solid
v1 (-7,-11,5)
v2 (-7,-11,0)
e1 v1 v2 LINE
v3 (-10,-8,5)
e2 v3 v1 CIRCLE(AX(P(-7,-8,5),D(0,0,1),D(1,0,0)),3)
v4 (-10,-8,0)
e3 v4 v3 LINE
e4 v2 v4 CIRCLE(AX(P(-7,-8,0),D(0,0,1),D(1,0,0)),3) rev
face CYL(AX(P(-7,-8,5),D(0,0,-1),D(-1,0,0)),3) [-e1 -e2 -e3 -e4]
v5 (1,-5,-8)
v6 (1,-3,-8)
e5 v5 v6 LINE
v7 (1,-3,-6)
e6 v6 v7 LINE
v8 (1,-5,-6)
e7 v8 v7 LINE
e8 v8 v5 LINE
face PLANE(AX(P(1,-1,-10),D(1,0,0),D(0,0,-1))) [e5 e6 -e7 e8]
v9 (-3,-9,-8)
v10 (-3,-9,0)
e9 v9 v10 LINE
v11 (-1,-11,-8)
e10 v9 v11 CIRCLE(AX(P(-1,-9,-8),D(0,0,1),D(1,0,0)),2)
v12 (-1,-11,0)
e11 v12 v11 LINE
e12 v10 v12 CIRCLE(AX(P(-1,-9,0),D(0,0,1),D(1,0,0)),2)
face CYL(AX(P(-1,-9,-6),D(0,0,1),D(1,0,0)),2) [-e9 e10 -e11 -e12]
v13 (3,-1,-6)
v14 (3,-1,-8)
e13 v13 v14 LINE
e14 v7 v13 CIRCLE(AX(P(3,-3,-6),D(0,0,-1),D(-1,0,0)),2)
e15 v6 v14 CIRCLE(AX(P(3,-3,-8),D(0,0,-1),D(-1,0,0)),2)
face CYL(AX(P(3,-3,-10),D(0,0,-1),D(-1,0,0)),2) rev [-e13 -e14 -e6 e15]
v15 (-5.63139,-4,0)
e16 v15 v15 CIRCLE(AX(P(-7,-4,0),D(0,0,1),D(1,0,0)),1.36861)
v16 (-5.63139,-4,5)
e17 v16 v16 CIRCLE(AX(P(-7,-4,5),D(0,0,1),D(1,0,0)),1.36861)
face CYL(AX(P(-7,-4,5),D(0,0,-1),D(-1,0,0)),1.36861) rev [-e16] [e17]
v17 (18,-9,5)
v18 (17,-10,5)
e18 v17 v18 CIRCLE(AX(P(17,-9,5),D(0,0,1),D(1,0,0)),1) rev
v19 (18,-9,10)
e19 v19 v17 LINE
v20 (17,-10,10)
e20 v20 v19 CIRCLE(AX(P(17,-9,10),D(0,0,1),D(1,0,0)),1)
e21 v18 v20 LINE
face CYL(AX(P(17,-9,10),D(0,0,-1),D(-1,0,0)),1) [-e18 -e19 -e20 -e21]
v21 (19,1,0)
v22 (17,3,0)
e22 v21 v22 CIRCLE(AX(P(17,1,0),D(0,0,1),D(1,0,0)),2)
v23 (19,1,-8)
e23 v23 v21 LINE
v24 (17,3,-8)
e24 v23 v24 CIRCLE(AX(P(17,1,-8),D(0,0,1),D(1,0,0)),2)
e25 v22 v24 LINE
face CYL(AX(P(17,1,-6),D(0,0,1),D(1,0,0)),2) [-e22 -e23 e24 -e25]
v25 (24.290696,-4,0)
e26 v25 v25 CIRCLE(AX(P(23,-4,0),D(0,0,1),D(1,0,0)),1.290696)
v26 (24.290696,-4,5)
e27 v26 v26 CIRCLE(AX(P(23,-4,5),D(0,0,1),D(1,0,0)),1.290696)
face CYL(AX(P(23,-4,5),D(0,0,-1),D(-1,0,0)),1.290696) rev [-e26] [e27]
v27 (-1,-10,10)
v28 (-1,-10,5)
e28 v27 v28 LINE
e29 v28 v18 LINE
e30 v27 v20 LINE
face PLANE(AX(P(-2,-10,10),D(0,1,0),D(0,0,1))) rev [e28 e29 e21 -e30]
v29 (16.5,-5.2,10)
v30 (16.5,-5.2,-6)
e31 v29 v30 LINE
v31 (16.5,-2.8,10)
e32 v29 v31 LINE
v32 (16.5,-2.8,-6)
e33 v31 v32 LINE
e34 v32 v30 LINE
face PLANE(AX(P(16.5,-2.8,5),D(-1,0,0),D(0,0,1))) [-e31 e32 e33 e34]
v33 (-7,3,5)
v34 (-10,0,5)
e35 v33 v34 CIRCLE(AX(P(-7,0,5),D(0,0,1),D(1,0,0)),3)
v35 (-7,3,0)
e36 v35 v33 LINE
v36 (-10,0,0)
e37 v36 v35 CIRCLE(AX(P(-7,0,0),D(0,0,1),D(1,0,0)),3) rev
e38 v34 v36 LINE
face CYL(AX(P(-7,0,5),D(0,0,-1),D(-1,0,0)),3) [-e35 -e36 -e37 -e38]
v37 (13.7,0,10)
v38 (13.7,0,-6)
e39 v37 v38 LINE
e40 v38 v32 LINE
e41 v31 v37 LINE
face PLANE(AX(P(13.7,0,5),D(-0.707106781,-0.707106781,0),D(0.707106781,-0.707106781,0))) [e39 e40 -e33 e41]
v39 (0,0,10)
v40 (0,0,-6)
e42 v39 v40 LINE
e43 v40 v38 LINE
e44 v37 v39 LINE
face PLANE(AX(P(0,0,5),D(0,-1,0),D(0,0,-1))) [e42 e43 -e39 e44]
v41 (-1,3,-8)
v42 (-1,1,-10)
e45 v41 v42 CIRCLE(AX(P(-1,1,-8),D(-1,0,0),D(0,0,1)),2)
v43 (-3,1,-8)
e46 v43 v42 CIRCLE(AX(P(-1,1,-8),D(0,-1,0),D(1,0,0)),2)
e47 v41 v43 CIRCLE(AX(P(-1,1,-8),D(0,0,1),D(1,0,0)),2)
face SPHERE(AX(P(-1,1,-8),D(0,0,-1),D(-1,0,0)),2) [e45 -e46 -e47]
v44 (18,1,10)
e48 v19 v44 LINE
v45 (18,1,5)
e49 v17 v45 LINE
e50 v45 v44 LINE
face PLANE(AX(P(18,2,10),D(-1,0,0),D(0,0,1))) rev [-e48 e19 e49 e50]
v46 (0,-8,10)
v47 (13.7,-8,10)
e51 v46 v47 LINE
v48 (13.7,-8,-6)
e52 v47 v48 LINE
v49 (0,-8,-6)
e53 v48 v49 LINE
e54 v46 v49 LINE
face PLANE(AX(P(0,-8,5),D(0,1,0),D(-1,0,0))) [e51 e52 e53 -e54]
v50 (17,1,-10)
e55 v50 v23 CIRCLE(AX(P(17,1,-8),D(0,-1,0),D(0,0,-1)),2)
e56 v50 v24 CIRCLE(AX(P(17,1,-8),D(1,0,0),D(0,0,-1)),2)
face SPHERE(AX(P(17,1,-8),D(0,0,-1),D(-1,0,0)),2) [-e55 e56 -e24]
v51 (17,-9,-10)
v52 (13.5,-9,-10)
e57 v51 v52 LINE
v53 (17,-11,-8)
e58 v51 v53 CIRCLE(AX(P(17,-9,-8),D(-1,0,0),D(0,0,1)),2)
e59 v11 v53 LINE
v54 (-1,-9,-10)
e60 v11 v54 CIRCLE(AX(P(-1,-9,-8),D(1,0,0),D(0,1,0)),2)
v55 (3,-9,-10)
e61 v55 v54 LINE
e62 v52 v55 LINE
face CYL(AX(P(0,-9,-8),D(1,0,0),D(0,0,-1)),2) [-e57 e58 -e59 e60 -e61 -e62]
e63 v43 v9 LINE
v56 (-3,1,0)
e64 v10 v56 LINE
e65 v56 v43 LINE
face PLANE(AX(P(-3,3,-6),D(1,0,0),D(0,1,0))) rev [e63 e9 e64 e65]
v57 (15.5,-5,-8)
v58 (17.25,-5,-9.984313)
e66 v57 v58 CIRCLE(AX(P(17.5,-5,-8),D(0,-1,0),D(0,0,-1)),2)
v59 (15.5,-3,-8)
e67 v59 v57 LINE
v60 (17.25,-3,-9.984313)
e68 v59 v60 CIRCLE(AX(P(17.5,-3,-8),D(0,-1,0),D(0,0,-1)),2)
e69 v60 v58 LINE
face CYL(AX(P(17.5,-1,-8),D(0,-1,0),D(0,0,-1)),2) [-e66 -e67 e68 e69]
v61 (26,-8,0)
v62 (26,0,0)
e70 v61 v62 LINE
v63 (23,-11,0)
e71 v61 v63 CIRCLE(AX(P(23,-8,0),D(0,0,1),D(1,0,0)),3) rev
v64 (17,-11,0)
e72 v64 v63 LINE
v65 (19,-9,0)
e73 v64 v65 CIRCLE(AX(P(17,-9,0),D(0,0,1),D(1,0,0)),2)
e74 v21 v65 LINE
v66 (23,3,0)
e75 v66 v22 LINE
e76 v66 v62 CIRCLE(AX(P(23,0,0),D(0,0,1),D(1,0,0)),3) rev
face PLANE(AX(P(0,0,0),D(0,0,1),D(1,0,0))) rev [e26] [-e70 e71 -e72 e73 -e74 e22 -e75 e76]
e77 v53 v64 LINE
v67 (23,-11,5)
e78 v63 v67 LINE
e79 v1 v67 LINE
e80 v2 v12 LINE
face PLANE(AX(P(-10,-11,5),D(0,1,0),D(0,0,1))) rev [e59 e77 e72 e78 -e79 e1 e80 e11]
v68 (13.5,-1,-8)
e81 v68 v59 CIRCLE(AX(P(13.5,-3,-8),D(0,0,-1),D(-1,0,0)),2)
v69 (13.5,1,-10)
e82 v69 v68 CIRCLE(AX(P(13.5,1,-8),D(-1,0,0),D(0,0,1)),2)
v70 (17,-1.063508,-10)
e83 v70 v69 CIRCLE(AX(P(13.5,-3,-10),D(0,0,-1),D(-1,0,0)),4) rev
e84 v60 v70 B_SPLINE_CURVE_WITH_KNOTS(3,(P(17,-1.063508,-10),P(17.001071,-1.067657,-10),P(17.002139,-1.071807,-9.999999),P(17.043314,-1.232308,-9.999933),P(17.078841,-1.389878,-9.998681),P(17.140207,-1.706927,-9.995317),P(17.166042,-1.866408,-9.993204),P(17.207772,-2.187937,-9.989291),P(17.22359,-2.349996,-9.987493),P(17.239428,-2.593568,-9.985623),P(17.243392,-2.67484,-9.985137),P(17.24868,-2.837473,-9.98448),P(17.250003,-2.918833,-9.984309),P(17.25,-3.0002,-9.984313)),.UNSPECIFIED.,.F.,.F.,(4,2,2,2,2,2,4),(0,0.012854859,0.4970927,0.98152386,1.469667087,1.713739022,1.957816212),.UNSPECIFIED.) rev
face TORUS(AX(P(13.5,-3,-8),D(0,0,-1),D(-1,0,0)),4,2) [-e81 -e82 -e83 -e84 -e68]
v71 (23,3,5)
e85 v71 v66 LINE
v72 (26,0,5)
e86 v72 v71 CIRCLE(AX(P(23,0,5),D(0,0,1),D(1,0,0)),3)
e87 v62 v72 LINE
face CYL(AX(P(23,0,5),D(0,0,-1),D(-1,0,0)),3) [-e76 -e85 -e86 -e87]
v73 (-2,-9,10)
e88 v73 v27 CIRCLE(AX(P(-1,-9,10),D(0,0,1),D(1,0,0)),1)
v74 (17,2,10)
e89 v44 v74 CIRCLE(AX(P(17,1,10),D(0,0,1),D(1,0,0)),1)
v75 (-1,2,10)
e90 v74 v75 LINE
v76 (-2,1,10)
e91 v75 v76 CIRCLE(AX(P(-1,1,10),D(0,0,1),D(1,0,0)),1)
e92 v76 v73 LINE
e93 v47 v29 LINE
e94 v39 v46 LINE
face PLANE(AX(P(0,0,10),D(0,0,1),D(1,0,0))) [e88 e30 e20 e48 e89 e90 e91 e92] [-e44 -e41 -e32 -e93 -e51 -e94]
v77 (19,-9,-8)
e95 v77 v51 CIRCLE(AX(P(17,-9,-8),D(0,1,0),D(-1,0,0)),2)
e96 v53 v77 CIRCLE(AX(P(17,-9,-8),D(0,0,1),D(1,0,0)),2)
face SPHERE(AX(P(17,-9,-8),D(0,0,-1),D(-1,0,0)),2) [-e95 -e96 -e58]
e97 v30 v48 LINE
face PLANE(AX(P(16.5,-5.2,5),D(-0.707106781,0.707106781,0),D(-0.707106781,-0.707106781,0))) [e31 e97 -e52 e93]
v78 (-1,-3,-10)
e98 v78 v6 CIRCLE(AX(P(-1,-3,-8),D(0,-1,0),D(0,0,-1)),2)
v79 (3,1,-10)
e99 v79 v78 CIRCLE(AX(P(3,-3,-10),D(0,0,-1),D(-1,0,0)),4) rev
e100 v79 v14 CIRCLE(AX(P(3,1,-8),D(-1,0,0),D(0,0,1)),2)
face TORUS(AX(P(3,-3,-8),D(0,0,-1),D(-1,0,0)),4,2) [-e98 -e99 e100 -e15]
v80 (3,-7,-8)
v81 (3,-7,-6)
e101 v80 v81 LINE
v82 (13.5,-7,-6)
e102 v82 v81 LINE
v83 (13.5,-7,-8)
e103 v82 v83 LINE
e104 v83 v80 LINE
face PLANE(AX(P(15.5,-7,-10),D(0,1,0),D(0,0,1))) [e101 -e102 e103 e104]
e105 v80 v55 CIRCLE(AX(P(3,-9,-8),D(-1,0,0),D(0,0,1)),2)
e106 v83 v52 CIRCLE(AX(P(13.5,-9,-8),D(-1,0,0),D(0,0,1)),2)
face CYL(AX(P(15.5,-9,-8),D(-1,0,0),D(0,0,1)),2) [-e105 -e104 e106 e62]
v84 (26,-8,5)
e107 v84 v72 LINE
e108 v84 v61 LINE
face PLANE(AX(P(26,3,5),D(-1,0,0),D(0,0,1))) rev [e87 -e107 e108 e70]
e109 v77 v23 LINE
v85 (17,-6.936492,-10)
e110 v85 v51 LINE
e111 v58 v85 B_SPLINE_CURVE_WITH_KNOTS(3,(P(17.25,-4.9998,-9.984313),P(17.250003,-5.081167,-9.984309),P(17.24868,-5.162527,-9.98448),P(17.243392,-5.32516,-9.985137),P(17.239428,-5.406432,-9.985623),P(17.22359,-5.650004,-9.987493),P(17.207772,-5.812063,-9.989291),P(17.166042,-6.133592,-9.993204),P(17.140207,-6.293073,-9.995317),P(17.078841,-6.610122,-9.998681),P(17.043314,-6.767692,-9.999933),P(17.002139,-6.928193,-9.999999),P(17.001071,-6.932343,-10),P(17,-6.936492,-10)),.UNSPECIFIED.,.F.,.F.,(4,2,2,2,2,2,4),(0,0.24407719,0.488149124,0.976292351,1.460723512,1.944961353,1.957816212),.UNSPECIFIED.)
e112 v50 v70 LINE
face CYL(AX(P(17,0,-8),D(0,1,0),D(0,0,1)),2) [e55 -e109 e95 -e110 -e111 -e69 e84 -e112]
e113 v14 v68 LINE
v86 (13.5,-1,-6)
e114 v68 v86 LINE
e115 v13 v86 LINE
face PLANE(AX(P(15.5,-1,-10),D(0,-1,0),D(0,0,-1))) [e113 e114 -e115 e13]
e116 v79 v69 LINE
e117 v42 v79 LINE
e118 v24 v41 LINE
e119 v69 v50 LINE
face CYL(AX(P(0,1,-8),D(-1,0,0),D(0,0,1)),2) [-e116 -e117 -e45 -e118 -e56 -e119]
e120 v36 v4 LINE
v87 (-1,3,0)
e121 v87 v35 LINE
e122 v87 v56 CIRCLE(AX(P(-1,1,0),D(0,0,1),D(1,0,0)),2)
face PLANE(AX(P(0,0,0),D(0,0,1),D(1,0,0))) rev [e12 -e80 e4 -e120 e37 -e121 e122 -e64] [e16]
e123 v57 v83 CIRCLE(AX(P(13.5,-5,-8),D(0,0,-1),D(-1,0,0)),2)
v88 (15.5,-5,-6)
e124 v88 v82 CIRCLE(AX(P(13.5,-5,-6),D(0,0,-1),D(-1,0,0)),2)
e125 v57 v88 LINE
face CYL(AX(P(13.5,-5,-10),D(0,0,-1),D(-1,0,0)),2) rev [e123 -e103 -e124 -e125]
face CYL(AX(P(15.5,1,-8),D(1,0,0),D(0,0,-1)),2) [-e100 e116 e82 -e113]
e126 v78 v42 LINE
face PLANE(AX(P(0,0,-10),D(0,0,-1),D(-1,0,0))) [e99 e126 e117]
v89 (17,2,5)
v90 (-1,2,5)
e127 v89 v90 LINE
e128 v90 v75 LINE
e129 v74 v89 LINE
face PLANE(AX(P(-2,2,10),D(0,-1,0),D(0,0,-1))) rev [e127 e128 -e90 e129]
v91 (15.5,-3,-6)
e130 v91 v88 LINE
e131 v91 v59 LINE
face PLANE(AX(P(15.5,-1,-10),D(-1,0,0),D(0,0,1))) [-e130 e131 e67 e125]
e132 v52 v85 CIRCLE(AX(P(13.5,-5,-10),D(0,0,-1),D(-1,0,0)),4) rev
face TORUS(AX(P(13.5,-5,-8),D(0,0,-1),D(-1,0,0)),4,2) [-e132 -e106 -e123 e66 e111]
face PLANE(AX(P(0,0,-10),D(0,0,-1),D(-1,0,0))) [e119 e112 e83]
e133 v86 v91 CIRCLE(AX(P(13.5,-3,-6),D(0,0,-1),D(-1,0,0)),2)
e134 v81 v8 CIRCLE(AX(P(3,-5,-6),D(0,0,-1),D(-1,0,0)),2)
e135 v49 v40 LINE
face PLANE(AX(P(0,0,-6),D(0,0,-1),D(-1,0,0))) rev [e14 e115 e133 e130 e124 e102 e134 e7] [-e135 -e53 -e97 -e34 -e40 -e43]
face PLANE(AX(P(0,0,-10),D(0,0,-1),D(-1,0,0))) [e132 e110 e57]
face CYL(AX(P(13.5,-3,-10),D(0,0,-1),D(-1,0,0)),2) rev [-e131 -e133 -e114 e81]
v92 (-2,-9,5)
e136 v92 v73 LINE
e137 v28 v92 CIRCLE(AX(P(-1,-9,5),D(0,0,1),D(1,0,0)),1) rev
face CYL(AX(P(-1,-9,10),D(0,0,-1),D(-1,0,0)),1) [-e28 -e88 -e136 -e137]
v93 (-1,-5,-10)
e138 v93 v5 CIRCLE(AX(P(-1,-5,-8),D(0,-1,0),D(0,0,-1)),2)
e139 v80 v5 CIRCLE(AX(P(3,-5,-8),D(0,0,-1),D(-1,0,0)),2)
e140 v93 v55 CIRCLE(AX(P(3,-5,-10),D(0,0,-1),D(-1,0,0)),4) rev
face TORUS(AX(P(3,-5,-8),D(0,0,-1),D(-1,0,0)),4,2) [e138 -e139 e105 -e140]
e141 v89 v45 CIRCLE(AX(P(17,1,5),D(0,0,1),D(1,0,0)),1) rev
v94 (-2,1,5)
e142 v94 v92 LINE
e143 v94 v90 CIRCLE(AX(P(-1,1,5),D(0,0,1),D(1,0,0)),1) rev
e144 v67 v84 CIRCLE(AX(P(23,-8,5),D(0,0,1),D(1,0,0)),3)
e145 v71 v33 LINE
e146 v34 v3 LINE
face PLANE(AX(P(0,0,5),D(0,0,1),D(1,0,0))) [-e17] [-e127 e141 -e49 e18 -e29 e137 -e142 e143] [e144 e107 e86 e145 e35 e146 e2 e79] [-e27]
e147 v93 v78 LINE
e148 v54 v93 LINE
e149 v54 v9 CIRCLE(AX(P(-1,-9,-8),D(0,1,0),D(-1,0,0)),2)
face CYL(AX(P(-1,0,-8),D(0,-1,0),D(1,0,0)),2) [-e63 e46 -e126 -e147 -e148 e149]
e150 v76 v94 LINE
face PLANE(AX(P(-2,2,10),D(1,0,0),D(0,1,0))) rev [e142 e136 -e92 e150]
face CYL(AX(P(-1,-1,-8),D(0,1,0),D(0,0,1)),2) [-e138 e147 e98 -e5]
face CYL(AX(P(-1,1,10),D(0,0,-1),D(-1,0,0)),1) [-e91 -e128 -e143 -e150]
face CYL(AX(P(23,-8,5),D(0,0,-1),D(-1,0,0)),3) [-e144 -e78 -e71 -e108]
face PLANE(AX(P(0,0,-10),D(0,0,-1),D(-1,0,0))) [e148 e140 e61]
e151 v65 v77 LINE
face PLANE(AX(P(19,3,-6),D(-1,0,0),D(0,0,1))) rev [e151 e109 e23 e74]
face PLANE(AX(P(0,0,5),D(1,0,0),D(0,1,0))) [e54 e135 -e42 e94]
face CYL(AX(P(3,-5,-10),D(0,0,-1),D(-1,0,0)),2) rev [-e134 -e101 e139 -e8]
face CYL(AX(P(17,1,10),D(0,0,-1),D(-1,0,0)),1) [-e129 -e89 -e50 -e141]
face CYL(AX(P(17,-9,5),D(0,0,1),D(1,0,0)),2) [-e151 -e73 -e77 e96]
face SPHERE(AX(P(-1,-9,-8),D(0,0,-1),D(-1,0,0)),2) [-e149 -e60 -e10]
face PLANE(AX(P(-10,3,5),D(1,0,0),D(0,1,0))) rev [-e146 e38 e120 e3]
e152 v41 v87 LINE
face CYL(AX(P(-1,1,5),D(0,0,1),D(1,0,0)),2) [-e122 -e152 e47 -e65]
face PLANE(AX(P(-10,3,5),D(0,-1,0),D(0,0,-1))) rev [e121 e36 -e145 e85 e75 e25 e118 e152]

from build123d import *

# Parameters (mm, degrees)
SKETCH_1_W      = 36
SKETCH_1_H      = 14
SKETCH_1_R      = 1.368610336
SKETCH_1_R_2    = 1.290695583
EXTRUDE_1_DEPTH = 5
SKETCH_2_W      = 22
SKETCH_2_H      = 14
EXTRUDE_2_DEPTH = 6
SKETCH_3_W      = 22
SKETCH_3_H      = 14
SKETCH_3_W_2    = 14.5
SKETCH_3_H_2    = 6
EXTRUDE_3_DEPTH = 4
FILLET_1_R      = 3
FILLET_2_R      = 2
FILLET_3_R      = 2
SKETCH_4_W      = 20
SKETCH_4_H      = 12
EXTRUDE_4_DEPTH = 5
FILLET_4_R      = 1


with BuildPart() as part:
    # Эскиз1 → Бобышка-Вытянуть1 (new body)
    with BuildSketch(Plane.XY):
        with Locations((8, -4)):
            Rectangle(SKETCH_1_W, SKETCH_1_H)
        with Locations((-7, -4)):
            Circle(SKETCH_1_R, mode=Mode.SUBTRACT)
        with Locations((23, -4)):
            Circle(SKETCH_1_R_2, mode=Mode.SUBTRACT)
        Polygon((13.7, 0), (16.5, -2.8), (16.5, -5.2), (13.7, -8), (0, -8), (0, 0), align=None, mode=Mode.SUBTRACT)
    extrude(amount=EXTRUDE_1_DEPTH)

    # Эскиз2 → Бобышка-Вытянуть2 (add)
    with BuildSketch(Plane(origin=(0, 0, 0), x_dir=(-1, 0, 0), z_dir=(0, 0, -1))):
        with Locations((-8, -4)):
            Rectangle(SKETCH_2_W, SKETCH_2_H)
        Polygon((-16.5, -2.8), (-13.7, 0), (0, 0), (0, -8), (-13.7, -8), (-16.5, -5.2), align=None, mode=Mode.SUBTRACT)
    extrude(amount=EXTRUDE_2_DEPTH)

    # Эскиз3 → Бобышка-Вытянуть3 (add)
    with BuildSketch(Plane(origin=(0, 0, -6), x_dir=(-1, 0, 0), z_dir=(0, 0, -1))):
        with Locations((-8, -4)):
            Rectangle(SKETCH_3_W, SKETCH_3_H)
        with Locations((-8.25, -4)):
            Rectangle(SKETCH_3_W_2, SKETCH_3_H_2, mode=Mode.SUBTRACT)
    extrude(amount=EXTRUDE_3_DEPTH)

    # Скругление1
    fillet_1_edges = [part.edges().sort_by_distance(p)[0] for p in [
        (-10, 3, 2.5),
        (26, 3, 2.5),
        (26, -11, 2.5),
        (-10, -11, 2.5),
    ]]
    fillet(fillet_1_edges, radius=FILLET_1_R)

    # Скругление2
    # the kernel refuses this fillet: 2 mm, written as the material it adds along each edge
    with BuildSketch(Plane(origin=(15.5, -7, -6), x_dir=(0, 1, 0), z_dir=(0, 0, -1)), Plane(origin=(1, -7, -6), x_dir=(1, 0, 0), z_dir=(0, 0, -1)), Plane(origin=(1, -1, -6), x_dir=(0, -1, 0), z_dir=(0, 0, -1))) as fillet_2_piece_1:
        with BuildLine():
            CenterArc((FILLET_2_R, -FILLET_2_R), FILLET_2_R, 90, 90)
            Line((0, -FILLET_2_R), (0, 0))
            Line((0, 0), (FILLET_2_R, 0))
        make_face()
    extrude(amount=4)
    with BuildSketch(Plane(origin=(15.5, -1, -6), x_dir=(0, -1, 0), z_dir=(0, 0, -1))) as fillet_2_piece_2:
        with BuildLine():
            CenterArc((FILLET_2_R, FILLET_2_R), FILLET_2_R, 180, 90)
            Line((0, FILLET_2_R), (0, 0))
            Line((0, 0), (FILLET_2_R, 0))
        make_face()
    extrude(amount=4)
    # the kernel refuses this fillet: 2 mm, written as the material it takes off along each edge
    with BuildSketch(Plane(origin=(19, 3, 0), x_dir=(-1, 0, 0), z_dir=(0, 0, -1)), Plane(origin=(-3, 3, -15), x_dir=(1, 0, 0), z_dir=(0, 0, 1))) as fillet_2_2_piece_1:
        with BuildLine():
            CenterArc((FILLET_2_R, -FILLET_2_R), FILLET_2_R, 90, 90)
            Line((0, -FILLET_2_R), (0, 0))
            Line((0, 0), (FILLET_2_R, 0))
        make_face()
    extrude(amount=15, mode=Mode.SUBTRACT)
    with BuildSketch(Plane(origin=(19, -11, 0), x_dir=(-1, 0, 0), z_dir=(0, 0, -1)), Plane(origin=(-3, -11, -15), x_dir=(1, 0, 0), z_dir=(0, 0, 1))) as fillet_2_2_piece_2:
        with BuildLine():
            CenterArc((FILLET_2_R, FILLET_2_R), FILLET_2_R, 180, 90)
            Line((0, FILLET_2_R), (0, 0))
            Line((0, 0), (FILLET_2_R, 0))
        make_face()
    extrude(amount=15, mode=Mode.SUBTRACT)

    # Скругление3
    # the kernel refuses this fillet: 2 mm, written as the material it takes off along each edge
    with BuildSketch(Plane(origin=(13.5, -1, -10), x_dir=(0, 1, 0), z_dir=(-1, 0, 0)), Plane(origin=(3, -7, -10), x_dir=(0, -1, 0), z_dir=(1, 0, 0))) as fillet_3_piece_1:
        with BuildLine():
            CenterArc((FILLET_3_R, -FILLET_3_R), FILLET_3_R, 90, 90)
            Line((0, -FILLET_3_R), (0, 0))
            Line((0, 0), (FILLET_3_R, 0))
        make_face()
    extrude(amount=10.5, mode=Mode.SUBTRACT)
    with BuildSketch(Plane(origin=(15.5, -5, -10), x_dir=(1, 0, 0), z_dir=(0, 1, 0)), Plane(origin=(1, -3, -10), x_dir=(-1, 0, 0), z_dir=(0, -1, 0))) as fillet_3_piece_2:
        with BuildLine():
            CenterArc((FILLET_3_R, -FILLET_3_R), FILLET_3_R, 90, 90)
            Line((0, -FILLET_3_R), (0, 0))
            Line((0, 0), (FILLET_3_R, 0))
        make_face()
    extrude(amount=2, mode=Mode.SUBTRACT)
    with BuildSketch(Plane(origin=(-3, 1, -10), x_dir=(1, 0, 0), z_dir=(0, -1, 0)), Plane(origin=(19, -9, -10), x_dir=(-1, 0, 0), z_dir=(0, 1, 0))) as fillet_3_piece_3:
        with BuildLine():
            CenterArc((FILLET_3_R, FILLET_3_R), FILLET_3_R, 180, 90)
            Line((0, FILLET_3_R), (0, 0))
            Line((0, 0), (FILLET_3_R, 0))
        make_face()
    extrude(amount=10, mode=Mode.SUBTRACT)
    with BuildSketch(Plane(origin=(-1, -11, -10), x_dir=(0, 1, 0), z_dir=(1, 0, 0)), Plane(origin=(17, 3, -10), x_dir=(0, -1, 0), z_dir=(-1, 0, 0))) as fillet_3_piece_4:
        with BuildLine():
            CenterArc((FILLET_3_R, FILLET_3_R), FILLET_3_R, 180, 90)
            Line((0, FILLET_3_R), (0, 0))
            Line((0, 0), (FILLET_3_R, 0))
        make_face()
    extrude(amount=18, mode=Mode.SUBTRACT)
    with BuildSketch(Plane(origin=(17, 1, -10), x_dir=(1, 0, 0), z_dir=(0, -1, 0))) as fillet_3_piece_5:
        with BuildLine():
            CenterArc((2 - FILLET_3_R, FILLET_3_R), FILLET_3_R, 270, 90)
            Line((2, FILLET_3_R), (2, 0))
            Line((2, 0), (2 - FILLET_3_R, 0))
        make_face()
    revolve(axis=Axis((17, 1, -10), (0, 0, 1)), revolution_arc=90, mode=Mode.SUBTRACT)
    with BuildSketch(Plane(origin=(17, -9, -10), x_dir=(0, -1, 0), z_dir=(-1, 0, 0))) as fillet_3_piece_6:
        with BuildLine():
            CenterArc((2 - FILLET_3_R, FILLET_3_R), FILLET_3_R, 270, 90)
            Line((2, FILLET_3_R), (2, 0))
            Line((2, 0), (2 - FILLET_3_R, 0))
        make_face()
    revolve(axis=Axis((17, -9, -10), (0, 0, 1)), revolution_arc=90, mode=Mode.SUBTRACT)
    with BuildSketch(Plane(origin=(-1, 1, -10), x_dir=(-1, 0, 0), z_dir=(0, -1, 0))) as fillet_3_piece_7:
        with BuildLine():
            CenterArc((2 - FILLET_3_R, -FILLET_3_R), FILLET_3_R, 0, 90)
            Line((2, -FILLET_3_R), (2, 0))
            Line((2, 0), (2 - FILLET_3_R, 0))
        make_face()
    revolve(axis=Axis((-1, 1, -10), (0, 0, -1)), revolution_arc=90, mode=Mode.SUBTRACT)
    with BuildSketch(Plane(origin=(-1, -9, -10), x_dir=(0, -1, 0), z_dir=(1, 0, 0))) as fillet_3_piece_8:
        with BuildLine():
            CenterArc((2 - FILLET_3_R, -FILLET_3_R), FILLET_3_R, 0, 90)
            Line((2, -FILLET_3_R), (2, 0))
            Line((2, 0), (2 - FILLET_3_R, 0))
        make_face()
    revolve(axis=Axis((-1, -9, -10), (0, 0, -1)), revolution_arc=90, mode=Mode.SUBTRACT)
    with BuildSketch(Plane(origin=(13.5, -3, -10), x_dir=(0, 1, 0), z_dir=(-1, 0, 0))) as fillet_3_piece_9:
        with BuildLine():
            CenterArc((2 + FILLET_3_R, -FILLET_3_R), FILLET_3_R, 90, 90)
            Line((2 + FILLET_3_R, 0), (2, 0))
            Line((2, 0), (2, -FILLET_3_R))
        make_face()
    revolve(axis=Axis((13.5, -3, -10), (0, 0, -1)), revolution_arc=90, mode=Mode.SUBTRACT)
    with BuildSketch(Plane(origin=(13.5, -5, -10), x_dir=(1, 0, 0), z_dir=(0, 1, 0))) as fillet_3_piece_10:
        with BuildLine():
            CenterArc((2 + FILLET_3_R, -FILLET_3_R), FILLET_3_R, 90, 90)
            Line((2, -FILLET_3_R), (2, 0))
            Line((2, 0), (2 + FILLET_3_R, 0))
        make_face()
    revolve(axis=Axis((13.5, -5, -10), (0, 0, -1)), revolution_arc=90, mode=Mode.SUBTRACT)
    with BuildSketch(Plane(origin=(3, -5, -10), x_dir=(0, -1, 0), z_dir=(1, 0, 0))) as fillet_3_piece_11:
        with BuildLine():
            CenterArc((2 + FILLET_3_R, -FILLET_3_R), FILLET_3_R, 90, 90)
            Line((2, -FILLET_3_R), (2, 0))
            Line((2, 0), (2 + FILLET_3_R, 0))
        make_face()
    revolve(axis=Axis((3, -5, -10), (0, 0, -1)), revolution_arc=90, mode=Mode.SUBTRACT)
    with BuildSketch(Plane(origin=(3, -3, -10), x_dir=(-1, 0, 0), z_dir=(0, -1, 0))) as fillet_3_piece_12:
        with BuildLine():
            CenterArc((2 + FILLET_3_R, -FILLET_3_R), FILLET_3_R, 90, 90)
            Line((2, -FILLET_3_R), (2, 0))
            Line((2, 0), (2 + FILLET_3_R, 0))
        make_face()
    revolve(axis=Axis((3, -3, -10), (0, 0, -1)), revolution_arc=90, mode=Mode.SUBTRACT)

    # Эскиз4 → Бобышка-Вытянуть4 (add)
    with BuildSketch(Plane.XY.offset(5)):
        with Locations((8, -4)):
            Rectangle(SKETCH_4_W, SKETCH_4_H)
        Polygon((0, 0), (13.7, 0), (16.5, -2.8), (16.5, -5.2), (13.7, -8), (0, -8), align=None, mode=Mode.SUBTRACT)
    extrude(amount=EXTRUDE_4_DEPTH)

    # Скругление4
    fillet_4_edges = [part.edges().sort_by_distance(p)[0] for p in [
        (-2, 2, 7.5),
        (-2, -10, 7.5),
        (18, -10, 7.5),
        (18, 2, 7.5),
    ]]
    fillet(fillet_4_edges, radius=FILLET_4_R)


solid = part.part
